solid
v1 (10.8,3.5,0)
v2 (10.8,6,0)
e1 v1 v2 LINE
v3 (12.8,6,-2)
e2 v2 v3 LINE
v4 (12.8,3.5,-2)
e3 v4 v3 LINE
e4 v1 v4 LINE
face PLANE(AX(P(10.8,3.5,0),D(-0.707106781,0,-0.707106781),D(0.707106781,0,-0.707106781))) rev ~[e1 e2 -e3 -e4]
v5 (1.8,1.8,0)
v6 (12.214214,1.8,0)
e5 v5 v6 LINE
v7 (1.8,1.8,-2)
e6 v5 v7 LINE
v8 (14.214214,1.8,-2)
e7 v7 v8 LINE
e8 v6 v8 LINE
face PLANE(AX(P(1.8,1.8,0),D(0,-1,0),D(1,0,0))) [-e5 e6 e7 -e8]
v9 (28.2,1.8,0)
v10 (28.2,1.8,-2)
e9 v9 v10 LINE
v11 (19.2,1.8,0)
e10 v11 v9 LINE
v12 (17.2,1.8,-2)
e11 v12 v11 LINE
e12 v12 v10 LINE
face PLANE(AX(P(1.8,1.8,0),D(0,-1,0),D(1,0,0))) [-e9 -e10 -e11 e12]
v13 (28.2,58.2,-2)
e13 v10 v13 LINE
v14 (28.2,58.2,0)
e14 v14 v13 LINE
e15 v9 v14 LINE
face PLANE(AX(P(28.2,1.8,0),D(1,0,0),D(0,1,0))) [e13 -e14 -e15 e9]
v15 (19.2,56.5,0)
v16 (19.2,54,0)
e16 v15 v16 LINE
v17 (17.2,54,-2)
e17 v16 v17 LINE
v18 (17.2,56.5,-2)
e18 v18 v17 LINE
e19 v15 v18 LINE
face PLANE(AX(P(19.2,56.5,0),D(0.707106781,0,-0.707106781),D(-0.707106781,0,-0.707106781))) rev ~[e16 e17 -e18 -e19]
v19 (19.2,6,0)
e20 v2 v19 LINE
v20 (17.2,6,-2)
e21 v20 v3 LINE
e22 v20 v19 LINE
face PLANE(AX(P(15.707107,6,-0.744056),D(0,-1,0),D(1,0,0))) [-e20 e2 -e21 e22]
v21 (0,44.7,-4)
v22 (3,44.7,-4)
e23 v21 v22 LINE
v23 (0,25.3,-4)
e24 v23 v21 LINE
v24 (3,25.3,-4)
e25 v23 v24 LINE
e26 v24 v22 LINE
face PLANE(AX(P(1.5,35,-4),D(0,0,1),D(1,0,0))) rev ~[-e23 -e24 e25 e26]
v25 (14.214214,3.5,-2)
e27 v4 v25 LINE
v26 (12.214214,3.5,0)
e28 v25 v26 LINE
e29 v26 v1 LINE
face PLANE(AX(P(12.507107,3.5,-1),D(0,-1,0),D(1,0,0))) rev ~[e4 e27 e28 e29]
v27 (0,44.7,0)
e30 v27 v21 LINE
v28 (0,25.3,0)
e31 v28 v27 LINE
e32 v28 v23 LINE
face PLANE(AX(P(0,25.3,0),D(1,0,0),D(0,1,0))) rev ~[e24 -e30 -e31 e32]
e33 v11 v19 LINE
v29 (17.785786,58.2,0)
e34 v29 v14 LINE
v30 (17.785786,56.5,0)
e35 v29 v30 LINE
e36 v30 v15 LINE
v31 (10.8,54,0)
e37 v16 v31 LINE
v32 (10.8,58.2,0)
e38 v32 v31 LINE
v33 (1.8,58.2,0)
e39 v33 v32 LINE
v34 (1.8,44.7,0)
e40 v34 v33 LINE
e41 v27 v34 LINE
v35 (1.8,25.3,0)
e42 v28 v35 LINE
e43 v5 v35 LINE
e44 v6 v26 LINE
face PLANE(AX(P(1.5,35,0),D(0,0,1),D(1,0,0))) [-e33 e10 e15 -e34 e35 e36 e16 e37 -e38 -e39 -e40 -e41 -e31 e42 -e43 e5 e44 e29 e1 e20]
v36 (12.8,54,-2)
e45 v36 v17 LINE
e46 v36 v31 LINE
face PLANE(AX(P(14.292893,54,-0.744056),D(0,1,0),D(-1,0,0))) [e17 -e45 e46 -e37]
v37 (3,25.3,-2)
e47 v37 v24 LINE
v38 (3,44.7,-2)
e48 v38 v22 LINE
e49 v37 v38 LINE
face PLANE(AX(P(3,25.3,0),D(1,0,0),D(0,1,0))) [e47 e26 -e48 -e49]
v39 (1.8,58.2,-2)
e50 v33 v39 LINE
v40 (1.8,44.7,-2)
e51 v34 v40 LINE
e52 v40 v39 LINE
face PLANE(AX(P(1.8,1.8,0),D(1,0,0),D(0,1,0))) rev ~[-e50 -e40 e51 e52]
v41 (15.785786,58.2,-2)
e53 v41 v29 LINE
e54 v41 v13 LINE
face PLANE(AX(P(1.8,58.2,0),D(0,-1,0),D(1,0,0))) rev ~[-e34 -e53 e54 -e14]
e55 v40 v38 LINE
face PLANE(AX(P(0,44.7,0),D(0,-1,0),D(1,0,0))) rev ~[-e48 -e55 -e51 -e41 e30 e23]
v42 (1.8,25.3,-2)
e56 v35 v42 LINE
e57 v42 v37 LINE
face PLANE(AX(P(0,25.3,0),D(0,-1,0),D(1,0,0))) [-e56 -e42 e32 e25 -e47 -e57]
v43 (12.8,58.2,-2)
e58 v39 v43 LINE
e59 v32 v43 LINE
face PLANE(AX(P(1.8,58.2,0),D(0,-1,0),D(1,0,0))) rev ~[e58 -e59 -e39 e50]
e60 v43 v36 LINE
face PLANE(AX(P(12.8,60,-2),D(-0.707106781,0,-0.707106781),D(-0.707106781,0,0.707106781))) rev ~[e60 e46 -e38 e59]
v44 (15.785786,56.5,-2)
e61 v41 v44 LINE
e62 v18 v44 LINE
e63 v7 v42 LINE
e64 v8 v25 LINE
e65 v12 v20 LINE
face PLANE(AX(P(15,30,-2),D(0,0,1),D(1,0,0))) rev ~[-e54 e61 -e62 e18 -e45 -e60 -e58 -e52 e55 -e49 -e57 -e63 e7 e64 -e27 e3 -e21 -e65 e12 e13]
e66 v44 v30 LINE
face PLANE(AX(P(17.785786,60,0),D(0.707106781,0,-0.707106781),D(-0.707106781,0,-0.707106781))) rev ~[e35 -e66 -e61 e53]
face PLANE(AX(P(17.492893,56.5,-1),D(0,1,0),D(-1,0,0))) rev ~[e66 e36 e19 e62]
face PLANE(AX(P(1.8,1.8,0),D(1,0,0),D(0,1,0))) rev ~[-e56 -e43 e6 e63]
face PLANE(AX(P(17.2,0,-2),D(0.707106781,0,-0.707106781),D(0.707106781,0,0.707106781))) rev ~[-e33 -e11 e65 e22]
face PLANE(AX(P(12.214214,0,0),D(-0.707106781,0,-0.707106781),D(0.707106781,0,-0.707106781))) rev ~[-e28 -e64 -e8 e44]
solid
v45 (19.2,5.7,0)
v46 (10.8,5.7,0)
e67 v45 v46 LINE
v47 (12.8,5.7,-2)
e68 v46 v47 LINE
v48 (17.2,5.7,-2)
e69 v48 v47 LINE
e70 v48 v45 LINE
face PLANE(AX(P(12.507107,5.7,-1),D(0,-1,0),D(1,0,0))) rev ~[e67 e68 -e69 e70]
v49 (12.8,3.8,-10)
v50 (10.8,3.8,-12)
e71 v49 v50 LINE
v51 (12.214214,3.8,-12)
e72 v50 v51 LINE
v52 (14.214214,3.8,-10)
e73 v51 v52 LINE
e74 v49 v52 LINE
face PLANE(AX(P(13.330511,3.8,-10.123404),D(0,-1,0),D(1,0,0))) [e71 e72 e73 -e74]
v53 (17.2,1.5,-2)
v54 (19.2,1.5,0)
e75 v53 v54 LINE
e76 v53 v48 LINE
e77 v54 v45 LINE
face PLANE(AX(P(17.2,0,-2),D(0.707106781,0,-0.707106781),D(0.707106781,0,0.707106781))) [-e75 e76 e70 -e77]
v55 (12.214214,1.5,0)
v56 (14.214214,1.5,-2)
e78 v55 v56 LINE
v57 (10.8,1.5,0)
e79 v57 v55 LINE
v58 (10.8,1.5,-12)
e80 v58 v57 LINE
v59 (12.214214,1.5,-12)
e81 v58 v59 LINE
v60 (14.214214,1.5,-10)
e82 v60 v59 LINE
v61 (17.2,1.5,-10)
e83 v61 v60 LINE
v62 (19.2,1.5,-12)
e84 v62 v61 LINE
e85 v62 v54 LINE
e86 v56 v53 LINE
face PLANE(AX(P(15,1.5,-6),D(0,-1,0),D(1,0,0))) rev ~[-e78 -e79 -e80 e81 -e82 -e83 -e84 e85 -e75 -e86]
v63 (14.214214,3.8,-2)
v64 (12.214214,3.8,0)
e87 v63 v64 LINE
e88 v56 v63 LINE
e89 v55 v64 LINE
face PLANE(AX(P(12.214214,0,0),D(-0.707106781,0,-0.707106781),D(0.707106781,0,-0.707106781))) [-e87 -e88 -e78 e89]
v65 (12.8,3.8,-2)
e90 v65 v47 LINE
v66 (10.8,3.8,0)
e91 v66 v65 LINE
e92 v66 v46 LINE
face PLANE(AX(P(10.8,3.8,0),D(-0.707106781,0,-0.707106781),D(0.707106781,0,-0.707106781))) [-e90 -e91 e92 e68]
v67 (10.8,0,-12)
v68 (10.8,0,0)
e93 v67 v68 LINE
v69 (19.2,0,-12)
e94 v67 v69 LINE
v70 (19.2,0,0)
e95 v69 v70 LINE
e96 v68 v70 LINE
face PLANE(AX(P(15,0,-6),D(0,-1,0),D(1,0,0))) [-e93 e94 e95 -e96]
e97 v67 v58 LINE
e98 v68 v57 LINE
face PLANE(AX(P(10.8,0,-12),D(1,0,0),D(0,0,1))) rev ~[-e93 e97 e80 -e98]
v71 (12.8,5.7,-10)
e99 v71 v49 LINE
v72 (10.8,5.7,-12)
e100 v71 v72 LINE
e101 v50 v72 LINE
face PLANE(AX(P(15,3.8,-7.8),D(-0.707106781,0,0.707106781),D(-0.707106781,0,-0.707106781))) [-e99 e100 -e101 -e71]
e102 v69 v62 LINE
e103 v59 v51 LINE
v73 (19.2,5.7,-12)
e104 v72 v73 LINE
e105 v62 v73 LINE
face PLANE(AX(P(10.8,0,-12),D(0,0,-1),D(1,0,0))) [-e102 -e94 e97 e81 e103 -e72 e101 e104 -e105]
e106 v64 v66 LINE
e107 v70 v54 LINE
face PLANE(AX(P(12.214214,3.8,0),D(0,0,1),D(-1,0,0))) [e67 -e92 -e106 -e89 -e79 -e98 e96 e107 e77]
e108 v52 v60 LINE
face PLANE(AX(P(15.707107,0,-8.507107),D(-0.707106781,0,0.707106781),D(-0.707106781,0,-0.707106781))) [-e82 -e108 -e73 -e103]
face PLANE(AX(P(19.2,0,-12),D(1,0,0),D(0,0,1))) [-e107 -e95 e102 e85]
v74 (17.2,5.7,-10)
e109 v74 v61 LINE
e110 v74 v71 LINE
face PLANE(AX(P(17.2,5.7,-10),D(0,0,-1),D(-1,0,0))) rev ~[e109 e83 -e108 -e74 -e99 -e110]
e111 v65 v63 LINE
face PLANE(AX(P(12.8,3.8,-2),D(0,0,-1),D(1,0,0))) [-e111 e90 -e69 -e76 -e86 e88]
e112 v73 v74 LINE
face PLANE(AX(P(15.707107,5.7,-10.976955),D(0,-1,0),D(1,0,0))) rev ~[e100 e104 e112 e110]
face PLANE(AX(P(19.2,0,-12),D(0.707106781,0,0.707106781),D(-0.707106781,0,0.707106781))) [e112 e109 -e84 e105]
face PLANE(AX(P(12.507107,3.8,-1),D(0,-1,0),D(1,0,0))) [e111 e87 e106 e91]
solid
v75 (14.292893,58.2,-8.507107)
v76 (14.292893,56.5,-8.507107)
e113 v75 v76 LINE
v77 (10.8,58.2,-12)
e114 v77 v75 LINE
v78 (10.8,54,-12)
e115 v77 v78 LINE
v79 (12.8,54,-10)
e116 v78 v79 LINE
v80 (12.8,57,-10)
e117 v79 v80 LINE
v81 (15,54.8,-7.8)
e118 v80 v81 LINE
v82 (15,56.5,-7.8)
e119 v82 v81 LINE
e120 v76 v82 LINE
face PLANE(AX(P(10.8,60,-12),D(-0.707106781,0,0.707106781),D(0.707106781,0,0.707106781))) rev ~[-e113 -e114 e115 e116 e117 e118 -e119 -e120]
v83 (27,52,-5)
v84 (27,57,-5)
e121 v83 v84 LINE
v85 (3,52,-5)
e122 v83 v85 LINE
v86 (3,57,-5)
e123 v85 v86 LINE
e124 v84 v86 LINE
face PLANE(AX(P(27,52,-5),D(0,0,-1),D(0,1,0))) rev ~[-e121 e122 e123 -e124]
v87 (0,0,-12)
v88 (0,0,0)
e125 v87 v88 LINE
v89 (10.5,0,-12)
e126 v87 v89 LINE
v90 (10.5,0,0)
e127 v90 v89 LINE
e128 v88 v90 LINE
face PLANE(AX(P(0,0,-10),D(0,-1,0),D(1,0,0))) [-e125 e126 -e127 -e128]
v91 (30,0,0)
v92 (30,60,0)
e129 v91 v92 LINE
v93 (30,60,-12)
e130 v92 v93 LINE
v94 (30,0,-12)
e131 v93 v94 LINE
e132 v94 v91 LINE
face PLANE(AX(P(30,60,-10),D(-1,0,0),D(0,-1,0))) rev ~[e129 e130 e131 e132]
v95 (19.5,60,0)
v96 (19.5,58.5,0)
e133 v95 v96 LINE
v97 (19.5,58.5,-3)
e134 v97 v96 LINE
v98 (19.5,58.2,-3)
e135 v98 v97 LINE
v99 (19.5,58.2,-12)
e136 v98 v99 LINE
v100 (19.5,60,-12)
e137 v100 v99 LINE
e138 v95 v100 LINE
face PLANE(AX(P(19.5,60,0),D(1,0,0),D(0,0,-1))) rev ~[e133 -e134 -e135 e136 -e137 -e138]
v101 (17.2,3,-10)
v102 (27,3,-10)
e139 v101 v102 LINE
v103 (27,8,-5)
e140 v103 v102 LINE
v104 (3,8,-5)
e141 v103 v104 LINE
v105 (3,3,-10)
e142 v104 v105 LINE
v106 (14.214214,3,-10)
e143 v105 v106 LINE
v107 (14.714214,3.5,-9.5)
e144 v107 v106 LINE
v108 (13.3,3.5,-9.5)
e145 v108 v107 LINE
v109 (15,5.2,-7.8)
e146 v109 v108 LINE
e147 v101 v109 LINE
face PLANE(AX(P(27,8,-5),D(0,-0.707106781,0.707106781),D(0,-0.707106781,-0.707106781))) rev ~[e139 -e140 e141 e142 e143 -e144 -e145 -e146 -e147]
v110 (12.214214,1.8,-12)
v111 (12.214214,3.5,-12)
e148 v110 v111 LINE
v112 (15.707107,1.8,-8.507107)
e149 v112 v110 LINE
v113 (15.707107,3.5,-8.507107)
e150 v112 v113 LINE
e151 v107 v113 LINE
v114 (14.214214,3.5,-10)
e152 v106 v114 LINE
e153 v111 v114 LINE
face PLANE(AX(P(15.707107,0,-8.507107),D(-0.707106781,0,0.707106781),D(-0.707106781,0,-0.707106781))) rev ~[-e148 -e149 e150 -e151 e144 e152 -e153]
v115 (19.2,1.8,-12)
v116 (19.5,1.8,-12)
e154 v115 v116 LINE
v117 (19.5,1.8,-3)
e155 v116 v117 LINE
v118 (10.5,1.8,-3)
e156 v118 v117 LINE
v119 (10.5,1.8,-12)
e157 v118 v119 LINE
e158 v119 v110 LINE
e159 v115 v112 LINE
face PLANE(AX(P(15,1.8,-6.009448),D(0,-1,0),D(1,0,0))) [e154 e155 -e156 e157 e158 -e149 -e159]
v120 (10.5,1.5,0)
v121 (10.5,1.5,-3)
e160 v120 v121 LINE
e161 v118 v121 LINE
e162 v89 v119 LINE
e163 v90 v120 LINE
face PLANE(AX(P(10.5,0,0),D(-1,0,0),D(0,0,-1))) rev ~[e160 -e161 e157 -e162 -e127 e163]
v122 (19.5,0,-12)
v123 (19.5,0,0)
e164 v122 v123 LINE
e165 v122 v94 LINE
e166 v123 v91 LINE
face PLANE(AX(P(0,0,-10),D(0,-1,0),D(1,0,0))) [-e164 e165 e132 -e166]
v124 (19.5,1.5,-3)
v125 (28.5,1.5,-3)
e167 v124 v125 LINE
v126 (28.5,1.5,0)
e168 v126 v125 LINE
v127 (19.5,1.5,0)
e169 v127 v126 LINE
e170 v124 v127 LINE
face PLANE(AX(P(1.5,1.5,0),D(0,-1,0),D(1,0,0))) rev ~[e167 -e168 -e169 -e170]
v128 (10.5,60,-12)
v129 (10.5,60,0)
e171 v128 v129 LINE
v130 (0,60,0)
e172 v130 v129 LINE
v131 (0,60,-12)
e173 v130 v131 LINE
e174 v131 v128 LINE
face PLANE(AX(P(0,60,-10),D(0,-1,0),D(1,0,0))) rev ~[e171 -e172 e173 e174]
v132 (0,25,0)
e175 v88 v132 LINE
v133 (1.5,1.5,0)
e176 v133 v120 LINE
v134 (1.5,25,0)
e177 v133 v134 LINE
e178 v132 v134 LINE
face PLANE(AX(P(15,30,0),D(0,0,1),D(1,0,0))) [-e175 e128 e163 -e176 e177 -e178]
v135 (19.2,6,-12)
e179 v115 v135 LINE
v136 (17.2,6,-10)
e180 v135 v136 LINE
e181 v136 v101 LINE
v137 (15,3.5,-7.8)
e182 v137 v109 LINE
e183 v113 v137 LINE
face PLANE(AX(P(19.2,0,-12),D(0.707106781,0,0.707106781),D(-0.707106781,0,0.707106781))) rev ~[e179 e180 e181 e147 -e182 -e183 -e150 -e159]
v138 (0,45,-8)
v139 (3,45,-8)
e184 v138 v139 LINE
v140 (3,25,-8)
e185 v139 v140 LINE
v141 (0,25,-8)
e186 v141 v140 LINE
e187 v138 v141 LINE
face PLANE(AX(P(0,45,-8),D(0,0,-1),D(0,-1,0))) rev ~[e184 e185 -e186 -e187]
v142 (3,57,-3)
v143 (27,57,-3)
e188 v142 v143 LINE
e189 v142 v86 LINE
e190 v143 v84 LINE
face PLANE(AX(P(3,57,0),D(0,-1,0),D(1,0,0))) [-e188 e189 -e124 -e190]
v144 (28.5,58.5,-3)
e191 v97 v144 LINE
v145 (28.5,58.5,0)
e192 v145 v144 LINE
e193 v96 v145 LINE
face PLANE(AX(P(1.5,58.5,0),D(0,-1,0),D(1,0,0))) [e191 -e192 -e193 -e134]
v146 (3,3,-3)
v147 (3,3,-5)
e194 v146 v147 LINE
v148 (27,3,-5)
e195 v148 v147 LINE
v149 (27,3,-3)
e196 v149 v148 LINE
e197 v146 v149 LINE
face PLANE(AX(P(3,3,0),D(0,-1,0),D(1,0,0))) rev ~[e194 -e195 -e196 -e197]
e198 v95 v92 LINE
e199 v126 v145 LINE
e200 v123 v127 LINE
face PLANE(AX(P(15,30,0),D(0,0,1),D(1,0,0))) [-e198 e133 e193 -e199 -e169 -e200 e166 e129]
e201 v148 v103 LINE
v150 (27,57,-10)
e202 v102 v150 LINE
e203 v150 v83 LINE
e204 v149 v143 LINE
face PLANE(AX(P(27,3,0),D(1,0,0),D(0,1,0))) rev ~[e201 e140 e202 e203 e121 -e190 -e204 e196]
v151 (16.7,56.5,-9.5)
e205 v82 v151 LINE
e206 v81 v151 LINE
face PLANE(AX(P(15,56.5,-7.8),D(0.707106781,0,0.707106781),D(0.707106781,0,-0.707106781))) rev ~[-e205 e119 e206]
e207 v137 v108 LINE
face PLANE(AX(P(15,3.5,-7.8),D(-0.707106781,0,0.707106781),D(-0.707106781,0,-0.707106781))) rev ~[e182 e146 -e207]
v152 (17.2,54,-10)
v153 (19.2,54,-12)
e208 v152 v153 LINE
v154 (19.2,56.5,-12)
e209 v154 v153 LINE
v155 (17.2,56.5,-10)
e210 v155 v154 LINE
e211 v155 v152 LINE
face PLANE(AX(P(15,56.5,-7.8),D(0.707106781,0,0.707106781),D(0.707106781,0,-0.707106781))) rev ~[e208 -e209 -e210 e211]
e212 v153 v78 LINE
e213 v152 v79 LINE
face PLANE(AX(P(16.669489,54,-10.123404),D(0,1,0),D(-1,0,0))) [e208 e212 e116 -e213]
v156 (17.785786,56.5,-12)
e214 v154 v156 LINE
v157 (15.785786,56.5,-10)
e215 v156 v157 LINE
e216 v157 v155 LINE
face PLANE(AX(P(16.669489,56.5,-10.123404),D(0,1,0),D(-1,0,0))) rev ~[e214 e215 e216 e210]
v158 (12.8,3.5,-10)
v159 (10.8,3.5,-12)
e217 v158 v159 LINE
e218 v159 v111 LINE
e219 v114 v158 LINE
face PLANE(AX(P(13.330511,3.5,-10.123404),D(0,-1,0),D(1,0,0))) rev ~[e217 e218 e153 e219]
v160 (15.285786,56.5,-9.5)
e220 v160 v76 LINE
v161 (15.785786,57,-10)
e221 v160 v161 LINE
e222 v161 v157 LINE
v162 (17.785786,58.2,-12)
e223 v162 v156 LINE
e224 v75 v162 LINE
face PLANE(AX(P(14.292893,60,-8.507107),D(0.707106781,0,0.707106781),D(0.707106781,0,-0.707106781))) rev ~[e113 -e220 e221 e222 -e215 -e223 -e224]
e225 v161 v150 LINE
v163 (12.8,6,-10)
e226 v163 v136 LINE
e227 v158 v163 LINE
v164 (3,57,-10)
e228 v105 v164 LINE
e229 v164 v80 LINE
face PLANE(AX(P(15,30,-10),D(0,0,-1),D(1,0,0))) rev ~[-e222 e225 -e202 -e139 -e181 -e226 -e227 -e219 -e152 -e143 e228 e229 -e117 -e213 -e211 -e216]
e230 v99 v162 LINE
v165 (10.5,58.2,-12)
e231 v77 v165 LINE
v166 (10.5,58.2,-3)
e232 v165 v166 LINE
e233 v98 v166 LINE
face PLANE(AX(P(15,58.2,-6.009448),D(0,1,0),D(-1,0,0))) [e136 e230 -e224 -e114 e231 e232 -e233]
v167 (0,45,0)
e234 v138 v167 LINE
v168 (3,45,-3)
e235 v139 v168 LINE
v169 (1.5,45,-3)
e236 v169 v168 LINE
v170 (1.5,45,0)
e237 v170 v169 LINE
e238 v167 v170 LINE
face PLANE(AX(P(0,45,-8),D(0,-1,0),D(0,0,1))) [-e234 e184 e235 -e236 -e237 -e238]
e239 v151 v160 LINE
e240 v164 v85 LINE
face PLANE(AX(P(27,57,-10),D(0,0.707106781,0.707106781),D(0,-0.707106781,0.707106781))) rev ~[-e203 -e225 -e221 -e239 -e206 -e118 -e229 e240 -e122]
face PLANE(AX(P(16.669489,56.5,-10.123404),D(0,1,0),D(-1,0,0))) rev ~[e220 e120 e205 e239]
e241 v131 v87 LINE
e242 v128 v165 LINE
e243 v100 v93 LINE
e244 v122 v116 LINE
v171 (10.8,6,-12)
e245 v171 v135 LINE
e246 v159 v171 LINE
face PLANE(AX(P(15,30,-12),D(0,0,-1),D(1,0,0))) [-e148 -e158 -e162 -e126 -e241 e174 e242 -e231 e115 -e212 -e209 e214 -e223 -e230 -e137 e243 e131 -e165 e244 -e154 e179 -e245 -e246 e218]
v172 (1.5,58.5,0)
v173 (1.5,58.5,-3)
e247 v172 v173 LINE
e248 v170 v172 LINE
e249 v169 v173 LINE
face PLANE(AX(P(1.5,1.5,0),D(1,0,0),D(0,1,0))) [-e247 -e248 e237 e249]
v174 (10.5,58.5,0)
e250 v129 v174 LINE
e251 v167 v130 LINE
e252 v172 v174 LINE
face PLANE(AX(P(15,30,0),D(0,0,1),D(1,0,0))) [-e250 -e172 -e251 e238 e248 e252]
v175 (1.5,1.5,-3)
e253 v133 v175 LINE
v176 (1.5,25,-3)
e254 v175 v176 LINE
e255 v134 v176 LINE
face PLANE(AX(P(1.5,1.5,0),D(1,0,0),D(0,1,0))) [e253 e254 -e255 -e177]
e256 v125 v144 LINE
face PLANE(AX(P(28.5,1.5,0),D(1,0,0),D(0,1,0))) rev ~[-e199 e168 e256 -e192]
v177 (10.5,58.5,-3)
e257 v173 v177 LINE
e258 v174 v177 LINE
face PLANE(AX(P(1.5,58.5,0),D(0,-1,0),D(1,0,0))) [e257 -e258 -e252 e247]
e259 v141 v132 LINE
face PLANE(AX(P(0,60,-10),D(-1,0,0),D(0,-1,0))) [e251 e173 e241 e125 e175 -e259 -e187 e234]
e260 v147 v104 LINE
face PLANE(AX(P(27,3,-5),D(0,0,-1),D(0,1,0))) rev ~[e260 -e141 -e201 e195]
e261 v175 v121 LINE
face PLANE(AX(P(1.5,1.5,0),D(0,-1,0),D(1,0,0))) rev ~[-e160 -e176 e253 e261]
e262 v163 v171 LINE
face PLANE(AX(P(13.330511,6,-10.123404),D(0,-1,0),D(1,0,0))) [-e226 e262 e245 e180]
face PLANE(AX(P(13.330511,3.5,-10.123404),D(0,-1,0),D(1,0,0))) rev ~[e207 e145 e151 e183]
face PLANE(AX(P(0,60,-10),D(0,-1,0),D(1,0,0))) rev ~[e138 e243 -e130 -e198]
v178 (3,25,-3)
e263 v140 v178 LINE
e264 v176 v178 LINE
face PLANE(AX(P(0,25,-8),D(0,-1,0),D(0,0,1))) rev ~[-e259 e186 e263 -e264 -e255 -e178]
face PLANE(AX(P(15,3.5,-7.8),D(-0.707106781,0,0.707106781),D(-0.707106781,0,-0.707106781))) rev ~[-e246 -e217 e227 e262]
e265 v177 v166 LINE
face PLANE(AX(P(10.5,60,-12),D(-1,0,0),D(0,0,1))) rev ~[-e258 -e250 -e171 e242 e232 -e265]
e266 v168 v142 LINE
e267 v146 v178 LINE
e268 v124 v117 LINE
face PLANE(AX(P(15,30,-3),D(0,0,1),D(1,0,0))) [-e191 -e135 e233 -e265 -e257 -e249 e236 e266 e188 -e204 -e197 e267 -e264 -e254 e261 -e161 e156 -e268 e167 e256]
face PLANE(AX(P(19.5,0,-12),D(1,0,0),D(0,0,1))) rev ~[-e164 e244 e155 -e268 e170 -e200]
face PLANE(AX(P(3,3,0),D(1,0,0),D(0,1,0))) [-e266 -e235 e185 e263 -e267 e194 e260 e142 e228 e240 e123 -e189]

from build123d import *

# Parameters (mm, degrees)
F0_W      = 30
F0_H      = 60
F0_W_2    = 27
F0_H_2    = 57
F0_W_3    = 26.4
F0_H_3    = 56.4
F0_W_4    = 24
F0_H_4    = 54
F1_DEPTH  = 10
F2_DEPTH  = 3
F3_W      = 30
F3_H      = 60
F4_DEPTH  = 2
F6_DEPTH  = 24
F7_DEPTH  = 2
F10_DEPTH = 1.8
F11_DEPTH = 6
F12_START = -3.5
F12_DEPTH = 2.5
F14_DEPTH = 1.8
F15_DEPTH = 6
F16_START = -3.5
F16_DEPTH = 2.5
F17_DEPTH = 6
F18_START = -3.5
F18_DEPTH = 2.5
F19_W     = 8.4
F19_H     = 12
F20_DEPTH = 1.5
F21_DEPTH = 5.7
F22_START = -3.8
F22_DEPTH = 1.9
F23_DEPTH = 6
F24_START = -3.5
F24_DEPTH = 2.5
F25_W     = 20
F25_H     = 8
F26_DEPTH = 3
F27_W     = 3
F27_H     = 19.4
F28_DEPTH = 4
F30_DEPTH = 4.2


with BuildPart() as f1:
    # F0 (on Top) → F1 (new body)
    with BuildSketch(Plane.XY):
        with Locations((15, 30)):
            Rectangle(F0_W, F0_H)
        with Locations((15, 30)):
            Rectangle(F0_W_2, F0_H_2, mode=Mode.SUBTRACT)
        with Locations((15, 30)):
            Rectangle(F0_W_2, F0_H_2)
        with Locations((15, 30)):
            Rectangle(F0_W_3, F0_H_3, mode=Mode.SUBTRACT)
        with Locations((15, 30)):
            Rectangle(F0_W_3, F0_H_3)
        with Locations((15, 30)):
            Rectangle(F0_W_4, F0_H_4, mode=Mode.SUBTRACT)
    extrude(amount=-F1_DEPTH)

    # F0 (on Top) → F2 (cut)
    with BuildSketch(Plane.XY):
        with Locations((15, 30)):
            Rectangle(F0_W_2, F0_H_2)
        with Locations((15, 30)):
            Rectangle(F0_W_3, F0_H_3, mode=Mode.SUBTRACT)
        with Locations((15, 30)):
            Rectangle(F0_W_3, F0_H_3)
        with Locations((15, 30)):
            Rectangle(F0_W_4, F0_H_4, mode=Mode.SUBTRACT)
    extrude(amount=-F2_DEPTH, mode=Mode.SUBTRACT)

    # F3 (on face) → F4 (join)
    with BuildSketch(Plane(origin=(0, 0, -10), x_dir=(1, 0, 0), z_dir=(0, 0, -1))):
        with Locations((15, -30)):
            Rectangle(F3_W, F3_H)
    extrude(amount=F4_DEPTH)

    # F5 (on face) → F6 (join, through all)
    with BuildSketch(Plane(origin=(27, 0, 0), x_dir=(0, -1, 0), z_dir=(-1, 0, 0))):
        Polygon((-8, -5), (-3, -10), (-3, -5), align=None)
        Polygon((-57, -5), (-57, -10), (-52, -5), align=None)
    extrude(amount=F6_DEPTH)

    # F9 (on face) → F10 (cut, through all)
    with BuildSketch(Plane.XZ):
        Polygon((10.8, 0), (10.5, 0), (10.5, -12), (10.8, -12), (15, -7.8), (15.7071067812, -8.5071067812), (19.2, -12), (19.5, -12), (19.5, 0), (19.2, 0), (17.2, -2), (14.2142135624, -2), (12.8, -2), align=None)
        Polygon((12.2142135624, 0), (10.8, 0), (12.8, -2), (14.2142135624, -2), align=None)
        Polygon((19.2, 0), (12.2142135624, 0), (14.2142135624, -2), (17.2, -2), align=None)
        Polygon((15.7071067812, -8.5071067812), (12.2142135624, -12), (19.2, -12), align=None)
        Polygon((15, -7.8), (10.8, -12), (12.2142135624, -12), (15.7071067812, -8.5071067812), align=None)
    extrude(amount=-F10_DEPTH, mode=Mode.SUBTRACT)

    # F13 (on face) → F14 (cut, through all)
    with BuildSketch(Plane(origin=(0, 60, 0), x_dir=(-1, 0, 0), z_dir=(0, 1, 0))):
        Polygon((-19.2, 0), (-19.5, 0), (-19.5, -12), (-19.2, -12), (-15, -7.8), (-14.2928932188, -8.5071067812), (-10.8, -12), (-10.5, -12), (-10.5, 0), (-10.8, 0), (-12.8, -2), (-15.7857864376, -2), (-17.2, -2), align=None)
        Polygon((-17.7857864376, 0), (-19.2, 0), (-17.2, -2), (-15.7857864376, -2), align=None)
        Polygon((-10.8, 0), (-17.7857864376, 0), (-15.7857864376, -2), (-12.8, -2), align=None)
        Polygon((-14.2928932188, -8.5071067812), (-17.7857864376, -12), (-10.8, -12), align=None)
        Polygon((-15, -7.8), (-19.2, -12), (-17.7857864376, -12), (-14.2928932188, -8.5071067812), align=None)
    extrude(amount=-F14_DEPTH, mode=Mode.SUBTRACT)

    # F9 (on face) → F17 (cut)
    with BuildSketch(Plane.XZ):
        Polygon((15.7071067812, -8.5071067812), (12.2142135624, -12), (19.2, -12), align=None)
    extrude(amount=-F17_DEPTH, mode=Mode.SUBTRACT)

    # F9 (on face) → F18 (cut)
    with BuildSketch(Plane.XZ.offset(F18_START)):
        Polygon((15, -7.8), (10.8, -12), (12.2142135624, -12), (15.7071067812, -8.5071067812), align=None)
    extrude(amount=-F18_DEPTH, mode=Mode.SUBTRACT)

    # F13 (on face) → F23 (cut)
    with BuildSketch(Plane(origin=(0, 60, 0), x_dir=(-1, 0, 0), z_dir=(0, 1, 0))):
        Polygon((-14.2928932188, -8.5071067812), (-17.7857864376, -12), (-10.8, -12), align=None)
    extrude(amount=-F23_DEPTH, mode=Mode.SUBTRACT)

    # F13 (on face) → F24 (cut)
    with BuildSketch(Plane(origin=(0, 60, 0), x_dir=(-1, 0, 0), z_dir=(0, 1, 0)).offset(F24_START)):
        Polygon((-15, -7.8), (-19.2, -12), (-17.7857864376, -12), (-14.2928932188, -8.5071067812), align=None)
    extrude(amount=-F24_DEPTH, mode=Mode.SUBTRACT)

    # F25 (on face) → F26 (cut, through all)
    with BuildSketch(Plane(origin=(0, 0, 0), x_dir=(0, -1, 0), z_dir=(-1, 0, 0))):
        with Locations((-35, -4)):
            Rectangle(F25_W, F25_H)
    extrude(amount=-F26_DEPTH, mode=Mode.SUBTRACT)


with BuildPart() as f7:
    # F0 (on Top) → F7 (new body)
    with BuildSketch(Plane.XY):
        with Locations((15, 30)):
            Rectangle(F0_W_3, F0_H_3)
        with Locations((15, 30)):
            Rectangle(F0_W_4, F0_H_4, mode=Mode.SUBTRACT)
        with Locations((15, 30)):
            Rectangle(F0_W_4, F0_H_4)
    extrude(amount=-F7_DEPTH)

    # F9 (on face) → F11 (cut)
    with BuildSketch(Plane.XZ):
        Polygon((19.2, 0), (12.2142135624, 0), (14.2142135624, -2), (17.2, -2), align=None)
    extrude(amount=-F11_DEPTH, mode=Mode.SUBTRACT)

    # F9 (on face) → F12 (cut)
    with BuildSketch(Plane.XZ.offset(F12_START)):
        Polygon((12.2142135624, 0), (10.8, 0), (12.8, -2), (14.2142135624, -2), align=None)
    extrude(amount=-F12_DEPTH, mode=Mode.SUBTRACT)

    # F13 (on face) → F15 (cut)
    with BuildSketch(Plane(origin=(0, 60, 0), x_dir=(-1, 0, 0), z_dir=(0, 1, 0))):
        Polygon((-10.8, 0), (-17.7857864376, 0), (-15.7857864376, -2), (-12.8, -2), align=None)
    extrude(amount=-F15_DEPTH, mode=Mode.SUBTRACT)

    # F13 (on face) → F16 (cut)
    with BuildSketch(Plane(origin=(0, 60, 0), x_dir=(-1, 0, 0), z_dir=(0, 1, 0)).offset(F16_START)):
        Polygon((-17.7857864376, 0), (-19.2, 0), (-17.2, -2), (-15.7857864376, -2), align=None)
    extrude(amount=-F16_DEPTH, mode=Mode.SUBTRACT)

    # F27 (on face) → F28 (join)
    with BuildSketch(Plane.XY):
        with Locations((1.5, 35)):
            Rectangle(F27_W, F27_H)
    extrude(amount=-F28_DEPTH)


with BuildPart() as f20:
    # F19 (on face) → F20 (new body)
    with BuildSketch(Plane.XZ):
        with Locations((15, -6)):
            Rectangle(F19_W, F19_H)
    extrude(amount=-F20_DEPTH)

    # F9 (on face) → F21 (join)
    with BuildSketch(Plane.XZ):
        Polygon((19.2, 0), (12.2142135624, 0), (14.2142135624, -2), (17.2, -2), align=None)
        Polygon((15.7071067812, -8.5071067812), (12.2142135624, -12), (19.2, -12), align=None)
    extrude(amount=-F21_DEPTH)

    # F9 (on face) → F22 (join)
    with BuildSketch(Plane.XZ.offset(F22_START)):
        Polygon((12.2142135624, 0), (10.8, 0), (12.8, -2), (14.2142135624, -2), align=None)
        Polygon((15, -7.8), (10.8, -12), (12.2142135624, -12), (15.7071067812, -8.5071067812), align=None)
    extrude(amount=-F22_DEPTH)

    # F29 (on face) → F30 (cut, through all)
    with BuildSketch(Plane(origin=(0, 5.7, 0), x_dir=(-1, 0, 0), z_dir=(0, 1, 0))):
        Polygon((-12.8, -10), (-15, -7.8), (-17.2, -10), align=None)
    extrude(amount=-F30_DEPTH, mode=Mode.SUBTRACT)


solid = Compound([f1.part, f7.part, f20.part])
